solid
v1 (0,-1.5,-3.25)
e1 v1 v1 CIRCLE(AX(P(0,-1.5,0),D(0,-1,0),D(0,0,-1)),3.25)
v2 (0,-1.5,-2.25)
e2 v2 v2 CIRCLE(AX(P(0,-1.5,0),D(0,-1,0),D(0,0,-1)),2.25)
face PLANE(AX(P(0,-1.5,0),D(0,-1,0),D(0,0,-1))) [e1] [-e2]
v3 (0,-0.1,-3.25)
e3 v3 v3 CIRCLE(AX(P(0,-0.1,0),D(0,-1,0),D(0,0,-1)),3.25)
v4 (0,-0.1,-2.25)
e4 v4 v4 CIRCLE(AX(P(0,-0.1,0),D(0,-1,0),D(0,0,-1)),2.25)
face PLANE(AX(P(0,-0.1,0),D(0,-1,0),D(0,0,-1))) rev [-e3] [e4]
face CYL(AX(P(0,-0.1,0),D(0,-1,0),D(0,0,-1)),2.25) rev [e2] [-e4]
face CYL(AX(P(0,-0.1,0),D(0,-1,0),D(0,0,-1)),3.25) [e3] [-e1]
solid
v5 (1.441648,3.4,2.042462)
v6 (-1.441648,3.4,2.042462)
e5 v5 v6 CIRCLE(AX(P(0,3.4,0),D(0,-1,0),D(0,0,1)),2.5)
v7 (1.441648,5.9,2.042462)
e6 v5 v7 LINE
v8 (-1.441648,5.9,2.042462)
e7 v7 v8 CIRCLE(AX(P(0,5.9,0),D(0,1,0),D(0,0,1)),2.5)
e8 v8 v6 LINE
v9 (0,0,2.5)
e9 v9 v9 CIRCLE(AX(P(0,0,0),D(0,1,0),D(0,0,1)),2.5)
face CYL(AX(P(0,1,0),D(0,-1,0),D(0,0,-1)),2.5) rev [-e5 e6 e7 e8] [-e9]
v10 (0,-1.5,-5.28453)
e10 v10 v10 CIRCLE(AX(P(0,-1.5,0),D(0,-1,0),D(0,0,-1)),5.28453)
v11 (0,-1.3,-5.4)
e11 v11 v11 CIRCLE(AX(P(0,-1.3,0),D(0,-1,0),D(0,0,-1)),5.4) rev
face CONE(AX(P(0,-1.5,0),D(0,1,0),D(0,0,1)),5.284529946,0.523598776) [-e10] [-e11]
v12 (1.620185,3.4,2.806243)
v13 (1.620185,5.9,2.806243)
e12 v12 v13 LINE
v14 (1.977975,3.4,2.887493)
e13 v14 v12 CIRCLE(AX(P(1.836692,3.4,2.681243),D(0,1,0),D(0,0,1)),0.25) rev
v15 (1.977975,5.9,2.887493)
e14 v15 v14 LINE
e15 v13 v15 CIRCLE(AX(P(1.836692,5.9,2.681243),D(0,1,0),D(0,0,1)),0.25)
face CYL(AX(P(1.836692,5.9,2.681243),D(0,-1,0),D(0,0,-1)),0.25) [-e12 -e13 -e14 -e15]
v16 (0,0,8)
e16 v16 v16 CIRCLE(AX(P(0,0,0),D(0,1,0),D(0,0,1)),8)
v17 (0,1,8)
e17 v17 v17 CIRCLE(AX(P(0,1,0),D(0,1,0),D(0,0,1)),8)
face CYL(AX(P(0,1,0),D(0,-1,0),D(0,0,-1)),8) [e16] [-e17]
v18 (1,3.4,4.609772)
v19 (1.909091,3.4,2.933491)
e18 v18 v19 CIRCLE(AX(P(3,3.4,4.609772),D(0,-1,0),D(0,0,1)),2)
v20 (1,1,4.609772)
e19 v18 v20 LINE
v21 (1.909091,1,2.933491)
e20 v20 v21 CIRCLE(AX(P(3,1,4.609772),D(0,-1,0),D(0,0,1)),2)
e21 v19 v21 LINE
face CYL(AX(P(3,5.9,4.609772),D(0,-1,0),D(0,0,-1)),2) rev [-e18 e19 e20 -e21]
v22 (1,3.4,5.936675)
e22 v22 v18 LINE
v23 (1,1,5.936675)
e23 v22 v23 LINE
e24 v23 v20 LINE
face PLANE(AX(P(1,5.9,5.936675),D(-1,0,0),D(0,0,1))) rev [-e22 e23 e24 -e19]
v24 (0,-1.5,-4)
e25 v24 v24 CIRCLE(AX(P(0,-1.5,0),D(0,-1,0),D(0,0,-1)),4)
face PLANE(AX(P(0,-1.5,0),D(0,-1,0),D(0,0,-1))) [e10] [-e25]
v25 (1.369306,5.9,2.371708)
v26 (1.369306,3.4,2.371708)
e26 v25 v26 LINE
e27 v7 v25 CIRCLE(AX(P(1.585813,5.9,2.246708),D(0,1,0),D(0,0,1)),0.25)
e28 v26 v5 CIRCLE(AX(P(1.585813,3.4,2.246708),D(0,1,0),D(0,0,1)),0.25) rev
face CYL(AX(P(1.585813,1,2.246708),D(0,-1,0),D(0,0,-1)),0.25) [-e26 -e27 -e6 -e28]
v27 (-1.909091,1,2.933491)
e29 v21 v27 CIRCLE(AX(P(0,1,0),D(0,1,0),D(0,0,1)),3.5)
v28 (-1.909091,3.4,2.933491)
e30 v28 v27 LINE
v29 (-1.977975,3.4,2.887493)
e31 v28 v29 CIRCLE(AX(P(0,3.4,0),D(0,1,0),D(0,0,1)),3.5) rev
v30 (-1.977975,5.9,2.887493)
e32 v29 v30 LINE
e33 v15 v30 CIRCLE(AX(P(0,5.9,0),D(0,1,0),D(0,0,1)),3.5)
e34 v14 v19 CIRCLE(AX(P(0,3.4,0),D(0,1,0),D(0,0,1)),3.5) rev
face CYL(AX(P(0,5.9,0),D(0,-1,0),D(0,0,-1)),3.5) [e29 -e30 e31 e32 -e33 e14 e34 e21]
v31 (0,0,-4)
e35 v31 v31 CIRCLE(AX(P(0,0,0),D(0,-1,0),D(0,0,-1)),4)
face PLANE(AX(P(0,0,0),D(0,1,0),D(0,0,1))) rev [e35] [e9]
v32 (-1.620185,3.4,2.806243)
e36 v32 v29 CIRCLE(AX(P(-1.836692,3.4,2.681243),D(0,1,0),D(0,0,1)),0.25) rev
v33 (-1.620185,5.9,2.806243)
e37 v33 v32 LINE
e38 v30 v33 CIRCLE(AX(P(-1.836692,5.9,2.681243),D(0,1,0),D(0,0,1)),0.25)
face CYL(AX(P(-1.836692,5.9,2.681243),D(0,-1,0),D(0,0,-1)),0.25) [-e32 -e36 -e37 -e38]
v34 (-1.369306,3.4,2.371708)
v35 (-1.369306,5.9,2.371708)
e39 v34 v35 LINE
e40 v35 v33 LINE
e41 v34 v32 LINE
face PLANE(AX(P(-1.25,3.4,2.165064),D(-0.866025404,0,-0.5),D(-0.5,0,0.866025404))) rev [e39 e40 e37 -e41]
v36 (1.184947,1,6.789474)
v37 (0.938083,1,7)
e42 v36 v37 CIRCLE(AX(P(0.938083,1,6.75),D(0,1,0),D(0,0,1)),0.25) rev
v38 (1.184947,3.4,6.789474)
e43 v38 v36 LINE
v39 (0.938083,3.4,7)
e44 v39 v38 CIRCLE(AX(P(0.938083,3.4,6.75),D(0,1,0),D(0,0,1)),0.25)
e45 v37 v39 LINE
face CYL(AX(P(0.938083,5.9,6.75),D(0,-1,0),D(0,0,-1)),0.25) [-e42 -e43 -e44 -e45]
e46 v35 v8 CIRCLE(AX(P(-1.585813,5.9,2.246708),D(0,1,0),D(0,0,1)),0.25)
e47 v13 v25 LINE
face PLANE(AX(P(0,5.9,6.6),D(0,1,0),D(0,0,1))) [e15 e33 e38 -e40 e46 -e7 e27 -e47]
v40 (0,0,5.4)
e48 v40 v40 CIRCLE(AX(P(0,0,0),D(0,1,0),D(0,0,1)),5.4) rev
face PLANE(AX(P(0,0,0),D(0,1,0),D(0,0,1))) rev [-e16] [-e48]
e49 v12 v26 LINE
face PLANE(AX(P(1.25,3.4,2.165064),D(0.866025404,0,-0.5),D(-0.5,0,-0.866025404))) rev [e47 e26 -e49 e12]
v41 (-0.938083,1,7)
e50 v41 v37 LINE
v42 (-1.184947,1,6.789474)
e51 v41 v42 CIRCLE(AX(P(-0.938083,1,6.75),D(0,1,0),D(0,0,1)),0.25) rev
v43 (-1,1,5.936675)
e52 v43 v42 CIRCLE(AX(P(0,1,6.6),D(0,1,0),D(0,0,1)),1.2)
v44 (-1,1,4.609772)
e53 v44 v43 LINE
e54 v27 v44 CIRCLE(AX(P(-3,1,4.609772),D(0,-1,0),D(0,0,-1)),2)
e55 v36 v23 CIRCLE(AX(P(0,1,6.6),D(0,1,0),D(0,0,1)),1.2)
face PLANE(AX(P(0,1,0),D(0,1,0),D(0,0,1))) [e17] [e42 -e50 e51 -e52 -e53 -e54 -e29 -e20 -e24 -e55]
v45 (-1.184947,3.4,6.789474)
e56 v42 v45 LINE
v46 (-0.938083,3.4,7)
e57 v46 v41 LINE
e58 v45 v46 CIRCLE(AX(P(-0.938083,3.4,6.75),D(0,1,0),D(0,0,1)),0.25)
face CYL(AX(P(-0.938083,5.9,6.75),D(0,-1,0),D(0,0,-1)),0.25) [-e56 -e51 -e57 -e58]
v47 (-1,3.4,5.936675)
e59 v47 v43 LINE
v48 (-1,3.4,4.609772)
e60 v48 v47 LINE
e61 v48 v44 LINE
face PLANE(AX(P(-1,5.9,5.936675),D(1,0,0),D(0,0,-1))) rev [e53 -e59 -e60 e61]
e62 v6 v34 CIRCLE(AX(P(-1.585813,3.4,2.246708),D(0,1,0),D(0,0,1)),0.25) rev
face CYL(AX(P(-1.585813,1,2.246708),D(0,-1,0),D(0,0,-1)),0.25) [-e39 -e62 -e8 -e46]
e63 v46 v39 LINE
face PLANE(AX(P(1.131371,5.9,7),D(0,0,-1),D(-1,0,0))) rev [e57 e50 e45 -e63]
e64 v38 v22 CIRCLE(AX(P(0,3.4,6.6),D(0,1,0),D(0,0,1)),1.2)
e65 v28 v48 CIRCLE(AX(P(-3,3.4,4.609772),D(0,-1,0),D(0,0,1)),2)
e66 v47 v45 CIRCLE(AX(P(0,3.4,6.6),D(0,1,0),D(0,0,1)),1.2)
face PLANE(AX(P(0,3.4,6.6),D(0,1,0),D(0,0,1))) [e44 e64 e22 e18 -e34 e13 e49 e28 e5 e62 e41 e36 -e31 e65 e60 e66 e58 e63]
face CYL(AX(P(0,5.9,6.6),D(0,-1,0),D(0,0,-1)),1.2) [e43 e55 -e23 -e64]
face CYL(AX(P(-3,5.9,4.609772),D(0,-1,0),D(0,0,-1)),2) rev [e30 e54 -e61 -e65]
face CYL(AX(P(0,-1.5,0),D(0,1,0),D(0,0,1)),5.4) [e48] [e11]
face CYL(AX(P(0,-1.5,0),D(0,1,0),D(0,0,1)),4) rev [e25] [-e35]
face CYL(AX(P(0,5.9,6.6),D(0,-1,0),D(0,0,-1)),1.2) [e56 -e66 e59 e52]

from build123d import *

# Parameters (mm, degrees)
ESQUISSE1_R             = 8
ESQUISSE1_R_2           = 2.5
BOSS_EXTRU_1_DEPTH      = 1
ESQUISSE2_R             = 2.5
BOSS_EXTRU_2_DEPTH      = 4.9
ESQUISSE4_R             = 5.4
ESQUISSE4_R_2           = 4
BOSS_EXTRU_3_DEPTH      = 1.5
ENL_V_START             = -2.5
ENL_V_MAT_EXTRU_3_DEPTH = 2.5
CONG_4_R                = 0.25
ESQUISSE6_R             = 3.25
ESQUISSE6_R_2           = 2.25
BOSS_EXTRU_4_DEPTH      = 1.4
CHANFREIN1_SIZE         = 0.2
CHANFREIN1_SIZE2        = 0.115470054


with BuildPart() as part:
    # Esquisse1 → Boss.-Extru.1 (new body)
    with BuildSketch(Plane(origin=(0, 0, 0), x_dir=(1, 0, 0), z_dir=(0, 1, 0))):
        with Locations(Location((0, 0, 0), (0, 0, 270))):
            Circle(ESQUISSE1_R)
        with Locations(Location((0, 0, 0), (0, 0, 270))):
            Circle(ESQUISSE1_R_2, mode=Mode.SUBTRACT)
    extrude(amount=BOSS_EXTRU_1_DEPTH)

    # Esquisse2 → Boss.-Extru.2 (add)
    with BuildSketch(Plane(origin=(0, 1, 0), x_dir=(1, 0, 0), z_dir=(0, 1, 0))):
        with BuildLine():
            Line((-1, -5.936675042), (-1, -4.609772229))
            ThreePointArc((-1, -4.609772229), (-1.241901854, -3.656309639), (-1.909090909, -2.933491418))
            ThreePointArc((-1.909090909, -2.933491418), (0, 3.5), (1.909090909, -2.933491418))
            ThreePointArc((1.909090909, -2.933491418), (1.241901854, -3.656309639), (1, -4.609772229))
            Line((1, -4.609772229), (1, -5.936675042))
            ThreePointArc((1, -5.936675042), (1.190945178, -6.452862026), (1.13137085, -7))
            Line((1.13137085, -7), (-1.13137085, -7))
            ThreePointArc((-1.13137085, -7), (-1.190945178, -6.452862026), (-1, -5.936675042))
        make_face()
        with Locations(Location((0, 0, 0), (0, 0, 270))):
            Circle(ESQUISSE2_R, mode=Mode.SUBTRACT)
    extrude(amount=BOSS_EXTRU_2_DEPTH)

    # Esquisse4 → Boss.-Extru.3 (add)
    with BuildSketch(Plane.XZ):
        with Locations(Location((0, 0, 0), (0, 0, 90))):
            Circle(ESQUISSE4_R)
        with Locations(Location((0, 0, 0), (0, 0, 270))):
            Circle(ESQUISSE4_R_2, mode=Mode.SUBTRACT)
    extrude(amount=BOSS_EXTRU_3_DEPTH)

    # Esquisse5 → Enlèv. mat.-Extru.3 (cut)
    with BuildSketch(Plane(origin=(0, 5.9, 0), x_dir=(1, 0, 0), z_dir=(0, 1, 0)).offset(ENL_V_START)):
        with BuildLine():
            Line((-1.25, -2.165063509), (-1.756893339, -3.043028526))
            ThreePointArc((-1.756893339, -3.043028526), (-1.199137245, -3.739776057), (-1, -4.609772229))
            Line((-1, -4.609772229), (-1, -5.936675042))
            ThreePointArc((-1, -5.936675042), (-1.190945178, -6.452862026), (-1.13137085, -7))
            Line((-1.13137085, -7), (1.13137085, -7))
            ThreePointArc((1.13137085, -7), (1.190945178, -6.452862026), (1, -5.936675042))
            Line((1, -5.936675042), (1, -4.609772229))
            ThreePointArc((1, -4.609772229), (1.199137245, -3.739776057), (1.756893339, -3.043028526))
            Line((1.756893339, -3.043028526), (1.25, -2.165063509))
            ThreePointArc((1.25, -2.165063509), (0, -2.5), (-1.25, -2.165063509))
        make_face()
    extrude(amount=ENL_V_MAT_EXTRU_3_DEPTH, mode=Mode.SUBTRACT)

    # Congé4
    # the kernel refuses this fillet: 0.25 mm, written as the material it takes off along each edge
    with BuildSketch(Plane(origin=(-1.756893339, 3.4, 3.043028526), x_dir=(-0.8178765908419041, 0, -0.5753936758019024), z_dir=(0, 1, 0))) as cong_4_piece_1:
        with BuildLine():
            CenterArc((0.27343415, -0.249980508), CONG_4_R, 90.715480429, 94.411725785)
            Line((0.024434464, -0.272322319), (-0.000465505, -0.2745565))
            Line((-0.000465505, -0.2745565), (-0.024899969, -0.002234181))
            Line((-0.024899969, -0.002234181), (0.001440168, 0.024958484))
            ThreePointArc((0.001440168, 0.024958484), (0.186602135, 0.022969346), (0.270000179, 0.024998051))
            Line((0.270000179, 0.024998051), (0.270312359, 0))
        make_face()
    extrude(amount=3.183540821, mode=Mode.SUBTRACT)
    with BuildSketch(Plane(origin=(-1.25, 3.4, 2.165063509), x_dir=(-0.5000000000000009, 0, 0.866025403784438), z_dir=(0, 1, 0))) as cong_4_piece_2:
        with BuildLine():
            CenterArc((0.238612788, -0.25), CONG_4_R, 90, 84.78409143)
            ThreePointArc((-0.010352011, -0.227272727), (-0.002589344, -0.113754183), (0, 0))
            Line((0, 0), (0.238612788, 0))
        make_face()
    extrude(amount=3.096531969, mode=Mode.SUBTRACT)
    with BuildSketch(Plane(origin=(1.25, 3.4, 2.165063509), x_dir=(0.5000000000000017, 0, 0.8660254037844376), z_dir=(0, 1, 0))) as cong_4_piece_3:
        with BuildLine():
            CenterArc((0.238612788, 0.25), CONG_4_R, 185.21590857, 84.78409143)
            ThreePointArc((-0.010352011, 0.227272727), (-0.002589344, 0.113754183), (0, 0))
            Line((0, 0), (0.238612788, 0))
        make_face()
    extrude(amount=3.096531969, mode=Mode.SUBTRACT)
    with BuildSketch(Plane(origin=(1.756893339, 3.4, 3.043028526), x_dir=(0.817876590841908, 0, -0.5753936758018968), z_dir=(0, 1, 0))) as cong_4_piece_4:
        with BuildLine():
            CenterArc((0.27343415, 0.249980508), CONG_4_R, 174.872793786, 94.411725785)
            Line((0.024434464, 0.272322319), (-0.000465505, 0.2745565))
            Line((-0.000465505, 0.2745565), (-0.024899969, 0.002234181))
            Line((-0.024899969, 0.002234181), (0.001440168, -0.024958484))
            ThreePointArc((0.001440168, -0.024958484), (0.186602135, -0.022969346), (0.270000179, -0.024998051))
            Line((0.270000179, -0.024998051), (0.270312359, 0))
        make_face()
    extrude(amount=3.183540821, mode=Mode.SUBTRACT)
    with BuildSketch(Plane(origin=(-1.13137085, 1, 7), x_dir=(1, 0, 0), z_dir=(0, 1, 0))) as cong_4_piece_5:
        with BuildLine():
            CenterArc((0.193287698, 0.25), CONG_4_R, 189.084720287, 80.915279713)
            ThreePointArc((-0.053576289, 0.210526316), (-0.031561904, 0.104048297), (0, 0))
            Line((0, 0), (0.193287698, 0))
        make_face()
    extrude(amount=2.943091546, mode=Mode.SUBTRACT)
    with BuildSketch(Plane(origin=(1.13137085, 1, 7), x_dir=(-1, 0, 0), z_dir=(0, 1, 0))) as cong_4_piece_6:
        with BuildLine():
            CenterArc((0.193287698, -0.25), CONG_4_R, 90, 80.915279713)
            ThreePointArc((-0.053576289, -0.210526316), (-0.031561904, -0.104048297), (0, 0))
            Line((0, 0), (0.193287698, 0))
        make_face()
    extrude(amount=2.943091546, mode=Mode.SUBTRACT)

    # Chanfrein1
    chanfrein1_edges = [part.edges().sort_by_distance(p)[0] for p in [
        (0, -1.5, -5.4),
    ]]
    chanfrein1_side = [part.faces().sort_by_distance(p)[0] for p in [
        (0, -0.75, -5.4),
    ]]
    chamfer(chanfrein1_edges, length=CHANFREIN1_SIZE, length2=CHANFREIN1_SIZE2, reference=chanfrein1_side[0])


with BuildPart() as body_2:
    # Esquisse6 → Boss.-Extru.4 (new body)
    with BuildSketch(Plane.XZ.offset(1.5)):
        with Locations(Location((0, 0, 0), (0, 0, 270))):
            Circle(ESQUISSE6_R)
        with Locations(Location((0, 0, 0), (0, 0, 270))):
            Circle(ESQUISSE6_R_2, mode=Mode.SUBTRACT)
    extrude(amount=-BOSS_EXTRU_4_DEPTH)


solid = Compound([part.part, body_2.part])
